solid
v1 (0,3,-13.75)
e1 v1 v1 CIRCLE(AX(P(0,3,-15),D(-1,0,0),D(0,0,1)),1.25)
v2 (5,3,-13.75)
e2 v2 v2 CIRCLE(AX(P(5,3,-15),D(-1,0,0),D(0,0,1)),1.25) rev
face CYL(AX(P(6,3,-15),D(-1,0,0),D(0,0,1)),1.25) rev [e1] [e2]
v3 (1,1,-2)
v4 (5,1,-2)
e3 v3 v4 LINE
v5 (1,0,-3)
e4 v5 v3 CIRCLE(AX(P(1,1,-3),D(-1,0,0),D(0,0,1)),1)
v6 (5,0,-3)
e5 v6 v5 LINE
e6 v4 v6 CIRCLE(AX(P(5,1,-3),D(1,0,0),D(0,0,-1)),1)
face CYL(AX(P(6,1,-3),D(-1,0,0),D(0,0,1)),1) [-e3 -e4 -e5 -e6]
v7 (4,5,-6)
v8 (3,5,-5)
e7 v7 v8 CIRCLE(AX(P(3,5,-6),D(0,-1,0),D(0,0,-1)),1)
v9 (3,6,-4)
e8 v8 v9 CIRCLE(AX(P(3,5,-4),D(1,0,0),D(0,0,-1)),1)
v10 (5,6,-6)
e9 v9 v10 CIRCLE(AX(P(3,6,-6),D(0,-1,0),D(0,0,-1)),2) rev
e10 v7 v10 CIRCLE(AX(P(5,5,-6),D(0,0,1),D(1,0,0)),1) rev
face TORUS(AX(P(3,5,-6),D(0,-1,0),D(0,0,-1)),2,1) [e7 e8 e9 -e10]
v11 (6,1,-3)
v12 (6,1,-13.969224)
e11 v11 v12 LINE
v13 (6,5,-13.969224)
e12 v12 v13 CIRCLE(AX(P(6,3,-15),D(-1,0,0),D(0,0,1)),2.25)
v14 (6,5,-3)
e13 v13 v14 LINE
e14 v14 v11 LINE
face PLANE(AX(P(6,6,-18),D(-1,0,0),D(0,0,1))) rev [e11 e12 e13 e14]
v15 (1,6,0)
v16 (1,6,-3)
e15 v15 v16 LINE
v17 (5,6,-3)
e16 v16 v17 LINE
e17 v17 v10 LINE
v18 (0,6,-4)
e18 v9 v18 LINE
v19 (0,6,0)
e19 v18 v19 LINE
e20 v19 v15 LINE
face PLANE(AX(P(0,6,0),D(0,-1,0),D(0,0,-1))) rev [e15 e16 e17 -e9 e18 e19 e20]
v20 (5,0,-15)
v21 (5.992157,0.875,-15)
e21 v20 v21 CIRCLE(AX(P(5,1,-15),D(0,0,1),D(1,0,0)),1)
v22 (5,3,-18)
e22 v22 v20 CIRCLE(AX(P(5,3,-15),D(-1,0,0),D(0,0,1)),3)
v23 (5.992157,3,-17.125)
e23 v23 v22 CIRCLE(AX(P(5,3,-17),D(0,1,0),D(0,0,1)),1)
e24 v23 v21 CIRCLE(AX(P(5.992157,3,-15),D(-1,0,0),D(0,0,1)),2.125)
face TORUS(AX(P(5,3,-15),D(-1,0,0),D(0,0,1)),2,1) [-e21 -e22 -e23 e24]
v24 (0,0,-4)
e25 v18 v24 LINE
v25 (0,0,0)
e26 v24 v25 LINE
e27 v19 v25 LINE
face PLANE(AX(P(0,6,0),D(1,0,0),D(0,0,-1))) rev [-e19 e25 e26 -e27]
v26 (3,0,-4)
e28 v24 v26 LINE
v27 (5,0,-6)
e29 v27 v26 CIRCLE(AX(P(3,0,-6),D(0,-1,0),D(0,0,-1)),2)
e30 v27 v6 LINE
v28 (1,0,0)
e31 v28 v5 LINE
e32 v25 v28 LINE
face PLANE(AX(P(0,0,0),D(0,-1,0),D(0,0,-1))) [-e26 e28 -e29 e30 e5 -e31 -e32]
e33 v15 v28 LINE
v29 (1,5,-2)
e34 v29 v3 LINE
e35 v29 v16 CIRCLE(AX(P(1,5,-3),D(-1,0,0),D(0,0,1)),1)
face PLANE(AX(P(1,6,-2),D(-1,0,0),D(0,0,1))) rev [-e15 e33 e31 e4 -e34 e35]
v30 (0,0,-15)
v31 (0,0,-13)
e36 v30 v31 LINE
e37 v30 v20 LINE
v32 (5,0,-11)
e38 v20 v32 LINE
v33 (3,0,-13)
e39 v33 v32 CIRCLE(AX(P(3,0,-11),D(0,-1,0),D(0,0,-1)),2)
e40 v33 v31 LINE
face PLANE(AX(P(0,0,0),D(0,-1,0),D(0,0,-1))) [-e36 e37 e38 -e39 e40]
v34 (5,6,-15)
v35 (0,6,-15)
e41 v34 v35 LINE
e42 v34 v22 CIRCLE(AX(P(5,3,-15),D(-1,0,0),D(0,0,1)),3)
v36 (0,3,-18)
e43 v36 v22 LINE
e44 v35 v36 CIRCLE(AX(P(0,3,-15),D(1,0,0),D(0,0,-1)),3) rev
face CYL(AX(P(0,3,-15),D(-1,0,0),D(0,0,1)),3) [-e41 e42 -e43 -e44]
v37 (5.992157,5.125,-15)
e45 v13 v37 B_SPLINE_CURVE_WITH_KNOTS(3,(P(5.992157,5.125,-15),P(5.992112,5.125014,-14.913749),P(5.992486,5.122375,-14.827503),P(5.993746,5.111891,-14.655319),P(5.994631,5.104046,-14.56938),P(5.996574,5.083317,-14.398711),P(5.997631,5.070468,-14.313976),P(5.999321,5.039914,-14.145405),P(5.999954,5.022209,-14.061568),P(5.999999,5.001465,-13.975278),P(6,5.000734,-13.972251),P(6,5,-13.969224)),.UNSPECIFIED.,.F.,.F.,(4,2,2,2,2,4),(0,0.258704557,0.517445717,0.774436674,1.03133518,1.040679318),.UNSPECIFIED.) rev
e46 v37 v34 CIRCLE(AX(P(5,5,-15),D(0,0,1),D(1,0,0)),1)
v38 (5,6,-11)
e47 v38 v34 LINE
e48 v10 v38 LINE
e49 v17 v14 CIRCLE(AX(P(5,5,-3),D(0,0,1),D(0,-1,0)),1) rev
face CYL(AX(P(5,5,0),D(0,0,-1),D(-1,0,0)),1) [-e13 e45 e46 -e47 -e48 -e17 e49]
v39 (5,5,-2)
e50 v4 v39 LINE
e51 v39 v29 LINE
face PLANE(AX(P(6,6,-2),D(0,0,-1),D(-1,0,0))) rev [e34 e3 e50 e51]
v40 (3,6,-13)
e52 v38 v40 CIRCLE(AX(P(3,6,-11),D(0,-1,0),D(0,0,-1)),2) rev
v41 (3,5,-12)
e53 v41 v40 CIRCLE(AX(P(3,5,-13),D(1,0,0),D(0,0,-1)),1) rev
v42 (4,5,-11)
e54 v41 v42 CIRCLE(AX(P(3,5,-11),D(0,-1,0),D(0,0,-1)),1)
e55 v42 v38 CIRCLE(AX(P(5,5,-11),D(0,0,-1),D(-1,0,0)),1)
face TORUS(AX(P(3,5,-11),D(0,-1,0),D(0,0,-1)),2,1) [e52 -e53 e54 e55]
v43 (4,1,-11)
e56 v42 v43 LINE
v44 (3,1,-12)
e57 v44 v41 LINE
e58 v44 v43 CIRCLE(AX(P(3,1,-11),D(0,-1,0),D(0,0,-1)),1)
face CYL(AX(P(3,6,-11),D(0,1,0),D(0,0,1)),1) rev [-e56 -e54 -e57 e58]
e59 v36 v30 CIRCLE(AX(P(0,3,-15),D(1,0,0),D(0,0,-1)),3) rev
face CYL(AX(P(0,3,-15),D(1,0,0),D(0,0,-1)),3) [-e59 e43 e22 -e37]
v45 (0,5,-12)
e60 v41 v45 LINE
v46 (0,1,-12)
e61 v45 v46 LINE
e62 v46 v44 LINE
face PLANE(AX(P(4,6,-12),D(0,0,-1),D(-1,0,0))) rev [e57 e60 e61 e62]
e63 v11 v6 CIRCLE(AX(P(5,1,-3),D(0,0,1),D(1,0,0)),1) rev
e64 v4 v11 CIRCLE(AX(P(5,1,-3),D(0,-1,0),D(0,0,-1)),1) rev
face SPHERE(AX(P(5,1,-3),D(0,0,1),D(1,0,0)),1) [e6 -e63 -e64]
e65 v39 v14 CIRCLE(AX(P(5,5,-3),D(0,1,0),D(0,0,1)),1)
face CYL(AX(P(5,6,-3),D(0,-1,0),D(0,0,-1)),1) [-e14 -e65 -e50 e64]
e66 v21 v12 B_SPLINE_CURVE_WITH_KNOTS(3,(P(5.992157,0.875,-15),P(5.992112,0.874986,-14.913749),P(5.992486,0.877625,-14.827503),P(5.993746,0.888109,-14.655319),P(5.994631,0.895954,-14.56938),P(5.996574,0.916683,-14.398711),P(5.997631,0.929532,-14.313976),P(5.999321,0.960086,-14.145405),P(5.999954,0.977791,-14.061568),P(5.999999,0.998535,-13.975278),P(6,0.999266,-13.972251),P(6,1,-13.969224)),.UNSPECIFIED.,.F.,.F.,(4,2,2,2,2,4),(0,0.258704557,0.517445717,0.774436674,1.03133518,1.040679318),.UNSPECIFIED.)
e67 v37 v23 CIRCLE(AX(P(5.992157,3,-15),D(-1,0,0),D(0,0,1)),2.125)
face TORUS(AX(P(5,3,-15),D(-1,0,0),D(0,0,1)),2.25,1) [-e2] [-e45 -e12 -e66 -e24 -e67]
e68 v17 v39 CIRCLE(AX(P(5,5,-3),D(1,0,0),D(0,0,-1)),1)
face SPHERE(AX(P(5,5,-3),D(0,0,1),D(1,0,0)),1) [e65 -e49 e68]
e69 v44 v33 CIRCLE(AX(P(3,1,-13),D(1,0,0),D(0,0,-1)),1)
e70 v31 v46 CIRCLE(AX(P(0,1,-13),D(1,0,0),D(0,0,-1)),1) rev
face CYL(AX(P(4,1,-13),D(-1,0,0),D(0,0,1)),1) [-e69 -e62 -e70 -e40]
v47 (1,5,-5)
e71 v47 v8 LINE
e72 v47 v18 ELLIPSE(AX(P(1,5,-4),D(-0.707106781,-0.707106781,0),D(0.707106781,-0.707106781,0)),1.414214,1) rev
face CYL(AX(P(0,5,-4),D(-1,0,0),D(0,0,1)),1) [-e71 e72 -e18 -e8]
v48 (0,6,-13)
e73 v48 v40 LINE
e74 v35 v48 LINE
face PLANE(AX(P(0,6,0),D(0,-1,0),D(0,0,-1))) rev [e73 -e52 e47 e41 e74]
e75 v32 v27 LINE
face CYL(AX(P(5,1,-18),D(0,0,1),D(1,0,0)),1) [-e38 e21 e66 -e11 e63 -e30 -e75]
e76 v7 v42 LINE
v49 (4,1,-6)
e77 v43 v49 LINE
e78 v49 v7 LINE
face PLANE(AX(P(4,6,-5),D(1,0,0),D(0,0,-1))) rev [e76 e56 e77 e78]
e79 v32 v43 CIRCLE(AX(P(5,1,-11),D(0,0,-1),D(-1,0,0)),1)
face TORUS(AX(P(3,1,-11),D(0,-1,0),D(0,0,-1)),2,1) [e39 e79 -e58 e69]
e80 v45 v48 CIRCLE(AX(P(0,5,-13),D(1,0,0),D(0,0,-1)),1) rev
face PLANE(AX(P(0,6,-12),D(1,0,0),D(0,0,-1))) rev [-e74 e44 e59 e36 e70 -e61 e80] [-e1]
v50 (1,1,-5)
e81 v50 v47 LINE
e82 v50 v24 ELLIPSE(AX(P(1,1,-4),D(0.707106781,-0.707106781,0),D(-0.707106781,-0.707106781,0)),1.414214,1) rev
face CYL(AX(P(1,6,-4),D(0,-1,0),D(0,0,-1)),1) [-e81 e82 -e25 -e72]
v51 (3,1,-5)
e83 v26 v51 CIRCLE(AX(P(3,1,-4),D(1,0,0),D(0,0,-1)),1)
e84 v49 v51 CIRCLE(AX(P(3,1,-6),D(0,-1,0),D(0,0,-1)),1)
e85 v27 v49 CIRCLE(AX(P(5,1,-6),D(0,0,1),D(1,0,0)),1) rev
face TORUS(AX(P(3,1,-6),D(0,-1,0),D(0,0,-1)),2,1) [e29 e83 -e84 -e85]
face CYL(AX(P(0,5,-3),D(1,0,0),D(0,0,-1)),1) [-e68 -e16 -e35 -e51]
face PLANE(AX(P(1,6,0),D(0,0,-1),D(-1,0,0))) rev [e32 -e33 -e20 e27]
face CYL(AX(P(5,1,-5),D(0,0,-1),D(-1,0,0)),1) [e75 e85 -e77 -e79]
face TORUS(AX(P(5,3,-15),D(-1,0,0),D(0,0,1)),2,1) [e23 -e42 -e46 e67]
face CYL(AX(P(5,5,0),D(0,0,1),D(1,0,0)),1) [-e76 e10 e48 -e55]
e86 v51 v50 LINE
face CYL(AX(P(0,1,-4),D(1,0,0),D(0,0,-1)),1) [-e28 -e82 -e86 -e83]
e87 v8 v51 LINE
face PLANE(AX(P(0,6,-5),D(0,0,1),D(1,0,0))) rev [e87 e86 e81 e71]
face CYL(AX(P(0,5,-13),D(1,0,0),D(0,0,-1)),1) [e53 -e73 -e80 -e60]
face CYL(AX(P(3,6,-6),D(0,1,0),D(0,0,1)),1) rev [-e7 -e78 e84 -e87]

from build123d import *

# Parameters (mm, degrees)
EXTRUDE_1_DEPTH     = 6
FILLET_1_R          = 3
FILLET_2_R          = 1
SKETCH_2_R          = 1.25
CUT_EXTRUDE_1_DEPTH = 20.899748742
FILLET_3_R          = 1


# Some blends are built 0.0001 mm under size
with BuildPart() as part:
    # Эскиз1 → Бобышка-Вытянуть1 (new body)
    with BuildSketch(Plane(origin=(0, 0, 0), x_dir=(1, 0, 0), z_dir=(0, 1, 0))):
        Polygon((0, 0), (0, 5), (4, 5), (4, 12), (0, 12), (0, 18), (6, 18), (6, 2), (1, 2), (1, 0), align=None)
    extrude(amount=EXTRUDE_1_DEPTH)

    # Скругление1
    fillet_1_edges = [part.edges().sort_by_distance(p)[0] for p in [
        (3, 0, -18),
        (3, 6, -18),
    ]]
    fillet(fillet_1_edges, radius=FILLET_1_R - 0.0001)  # a hair under: the kernel refuses the full size

    # Скругление2
    fillet_2_edges = [part.edges().sort_by_distance(p)[0] for p in [
        (3.5, 6, -2),
        (4, 0, -8.5),
        (2, 0, -12),
        (6, 0, -8.50005),
        (3.5, 0, -2),
        (6, 6, -8.50005),
        (0, 3, -5),
        (4, 3, -5),
        (4, 3, -12),
        (6, 3, -2),
        (2, 6, -12),
        (4, 6, -8.5),
        (2, 6, -5),
        (6, 5.121349633, -17.121349633),
        (6, 0.878650367, -17.121349633),
        (2, 0, -5),
    ]]
    fillet(fillet_2_edges, radius=FILLET_2_R - 0.0001)  # a hair under: the kernel refuses the full size

    # Эскиз2 → Вырез-Вытянуть1 (cut, through all)
    with BuildSketch(Plane.ZY):
        with Locations((-15, 3)):
            Circle(SKETCH_2_R)
    extrude(amount=-CUT_EXTRUDE_1_DEPTH, mode=Mode.SUBTRACT)

    # Скругление3
    # the kernel refuses this fillet: 1 mm, written as the material it takes off along each edge
    with BuildSketch(Plane(origin=(6, 3, -15), x_dir=(0, 0, 1), z_dir=(0, -1, 0))) as fillet_3_piece_1:
        with BuildLine():
            CenterArc((1.25 + FILLET_3_R, FILLET_3_R), FILLET_3_R, 180, 90)
            Line((1.25 + FILLET_3_R, 0), (1.25, 0))
            Line((1.25, 0), (1.25, FILLET_3_R))
        make_face()
    revolve(axis=Axis((6, 3, -15), (-1, 0, 0)), mode=Mode.SUBTRACT)


solid = part.part
